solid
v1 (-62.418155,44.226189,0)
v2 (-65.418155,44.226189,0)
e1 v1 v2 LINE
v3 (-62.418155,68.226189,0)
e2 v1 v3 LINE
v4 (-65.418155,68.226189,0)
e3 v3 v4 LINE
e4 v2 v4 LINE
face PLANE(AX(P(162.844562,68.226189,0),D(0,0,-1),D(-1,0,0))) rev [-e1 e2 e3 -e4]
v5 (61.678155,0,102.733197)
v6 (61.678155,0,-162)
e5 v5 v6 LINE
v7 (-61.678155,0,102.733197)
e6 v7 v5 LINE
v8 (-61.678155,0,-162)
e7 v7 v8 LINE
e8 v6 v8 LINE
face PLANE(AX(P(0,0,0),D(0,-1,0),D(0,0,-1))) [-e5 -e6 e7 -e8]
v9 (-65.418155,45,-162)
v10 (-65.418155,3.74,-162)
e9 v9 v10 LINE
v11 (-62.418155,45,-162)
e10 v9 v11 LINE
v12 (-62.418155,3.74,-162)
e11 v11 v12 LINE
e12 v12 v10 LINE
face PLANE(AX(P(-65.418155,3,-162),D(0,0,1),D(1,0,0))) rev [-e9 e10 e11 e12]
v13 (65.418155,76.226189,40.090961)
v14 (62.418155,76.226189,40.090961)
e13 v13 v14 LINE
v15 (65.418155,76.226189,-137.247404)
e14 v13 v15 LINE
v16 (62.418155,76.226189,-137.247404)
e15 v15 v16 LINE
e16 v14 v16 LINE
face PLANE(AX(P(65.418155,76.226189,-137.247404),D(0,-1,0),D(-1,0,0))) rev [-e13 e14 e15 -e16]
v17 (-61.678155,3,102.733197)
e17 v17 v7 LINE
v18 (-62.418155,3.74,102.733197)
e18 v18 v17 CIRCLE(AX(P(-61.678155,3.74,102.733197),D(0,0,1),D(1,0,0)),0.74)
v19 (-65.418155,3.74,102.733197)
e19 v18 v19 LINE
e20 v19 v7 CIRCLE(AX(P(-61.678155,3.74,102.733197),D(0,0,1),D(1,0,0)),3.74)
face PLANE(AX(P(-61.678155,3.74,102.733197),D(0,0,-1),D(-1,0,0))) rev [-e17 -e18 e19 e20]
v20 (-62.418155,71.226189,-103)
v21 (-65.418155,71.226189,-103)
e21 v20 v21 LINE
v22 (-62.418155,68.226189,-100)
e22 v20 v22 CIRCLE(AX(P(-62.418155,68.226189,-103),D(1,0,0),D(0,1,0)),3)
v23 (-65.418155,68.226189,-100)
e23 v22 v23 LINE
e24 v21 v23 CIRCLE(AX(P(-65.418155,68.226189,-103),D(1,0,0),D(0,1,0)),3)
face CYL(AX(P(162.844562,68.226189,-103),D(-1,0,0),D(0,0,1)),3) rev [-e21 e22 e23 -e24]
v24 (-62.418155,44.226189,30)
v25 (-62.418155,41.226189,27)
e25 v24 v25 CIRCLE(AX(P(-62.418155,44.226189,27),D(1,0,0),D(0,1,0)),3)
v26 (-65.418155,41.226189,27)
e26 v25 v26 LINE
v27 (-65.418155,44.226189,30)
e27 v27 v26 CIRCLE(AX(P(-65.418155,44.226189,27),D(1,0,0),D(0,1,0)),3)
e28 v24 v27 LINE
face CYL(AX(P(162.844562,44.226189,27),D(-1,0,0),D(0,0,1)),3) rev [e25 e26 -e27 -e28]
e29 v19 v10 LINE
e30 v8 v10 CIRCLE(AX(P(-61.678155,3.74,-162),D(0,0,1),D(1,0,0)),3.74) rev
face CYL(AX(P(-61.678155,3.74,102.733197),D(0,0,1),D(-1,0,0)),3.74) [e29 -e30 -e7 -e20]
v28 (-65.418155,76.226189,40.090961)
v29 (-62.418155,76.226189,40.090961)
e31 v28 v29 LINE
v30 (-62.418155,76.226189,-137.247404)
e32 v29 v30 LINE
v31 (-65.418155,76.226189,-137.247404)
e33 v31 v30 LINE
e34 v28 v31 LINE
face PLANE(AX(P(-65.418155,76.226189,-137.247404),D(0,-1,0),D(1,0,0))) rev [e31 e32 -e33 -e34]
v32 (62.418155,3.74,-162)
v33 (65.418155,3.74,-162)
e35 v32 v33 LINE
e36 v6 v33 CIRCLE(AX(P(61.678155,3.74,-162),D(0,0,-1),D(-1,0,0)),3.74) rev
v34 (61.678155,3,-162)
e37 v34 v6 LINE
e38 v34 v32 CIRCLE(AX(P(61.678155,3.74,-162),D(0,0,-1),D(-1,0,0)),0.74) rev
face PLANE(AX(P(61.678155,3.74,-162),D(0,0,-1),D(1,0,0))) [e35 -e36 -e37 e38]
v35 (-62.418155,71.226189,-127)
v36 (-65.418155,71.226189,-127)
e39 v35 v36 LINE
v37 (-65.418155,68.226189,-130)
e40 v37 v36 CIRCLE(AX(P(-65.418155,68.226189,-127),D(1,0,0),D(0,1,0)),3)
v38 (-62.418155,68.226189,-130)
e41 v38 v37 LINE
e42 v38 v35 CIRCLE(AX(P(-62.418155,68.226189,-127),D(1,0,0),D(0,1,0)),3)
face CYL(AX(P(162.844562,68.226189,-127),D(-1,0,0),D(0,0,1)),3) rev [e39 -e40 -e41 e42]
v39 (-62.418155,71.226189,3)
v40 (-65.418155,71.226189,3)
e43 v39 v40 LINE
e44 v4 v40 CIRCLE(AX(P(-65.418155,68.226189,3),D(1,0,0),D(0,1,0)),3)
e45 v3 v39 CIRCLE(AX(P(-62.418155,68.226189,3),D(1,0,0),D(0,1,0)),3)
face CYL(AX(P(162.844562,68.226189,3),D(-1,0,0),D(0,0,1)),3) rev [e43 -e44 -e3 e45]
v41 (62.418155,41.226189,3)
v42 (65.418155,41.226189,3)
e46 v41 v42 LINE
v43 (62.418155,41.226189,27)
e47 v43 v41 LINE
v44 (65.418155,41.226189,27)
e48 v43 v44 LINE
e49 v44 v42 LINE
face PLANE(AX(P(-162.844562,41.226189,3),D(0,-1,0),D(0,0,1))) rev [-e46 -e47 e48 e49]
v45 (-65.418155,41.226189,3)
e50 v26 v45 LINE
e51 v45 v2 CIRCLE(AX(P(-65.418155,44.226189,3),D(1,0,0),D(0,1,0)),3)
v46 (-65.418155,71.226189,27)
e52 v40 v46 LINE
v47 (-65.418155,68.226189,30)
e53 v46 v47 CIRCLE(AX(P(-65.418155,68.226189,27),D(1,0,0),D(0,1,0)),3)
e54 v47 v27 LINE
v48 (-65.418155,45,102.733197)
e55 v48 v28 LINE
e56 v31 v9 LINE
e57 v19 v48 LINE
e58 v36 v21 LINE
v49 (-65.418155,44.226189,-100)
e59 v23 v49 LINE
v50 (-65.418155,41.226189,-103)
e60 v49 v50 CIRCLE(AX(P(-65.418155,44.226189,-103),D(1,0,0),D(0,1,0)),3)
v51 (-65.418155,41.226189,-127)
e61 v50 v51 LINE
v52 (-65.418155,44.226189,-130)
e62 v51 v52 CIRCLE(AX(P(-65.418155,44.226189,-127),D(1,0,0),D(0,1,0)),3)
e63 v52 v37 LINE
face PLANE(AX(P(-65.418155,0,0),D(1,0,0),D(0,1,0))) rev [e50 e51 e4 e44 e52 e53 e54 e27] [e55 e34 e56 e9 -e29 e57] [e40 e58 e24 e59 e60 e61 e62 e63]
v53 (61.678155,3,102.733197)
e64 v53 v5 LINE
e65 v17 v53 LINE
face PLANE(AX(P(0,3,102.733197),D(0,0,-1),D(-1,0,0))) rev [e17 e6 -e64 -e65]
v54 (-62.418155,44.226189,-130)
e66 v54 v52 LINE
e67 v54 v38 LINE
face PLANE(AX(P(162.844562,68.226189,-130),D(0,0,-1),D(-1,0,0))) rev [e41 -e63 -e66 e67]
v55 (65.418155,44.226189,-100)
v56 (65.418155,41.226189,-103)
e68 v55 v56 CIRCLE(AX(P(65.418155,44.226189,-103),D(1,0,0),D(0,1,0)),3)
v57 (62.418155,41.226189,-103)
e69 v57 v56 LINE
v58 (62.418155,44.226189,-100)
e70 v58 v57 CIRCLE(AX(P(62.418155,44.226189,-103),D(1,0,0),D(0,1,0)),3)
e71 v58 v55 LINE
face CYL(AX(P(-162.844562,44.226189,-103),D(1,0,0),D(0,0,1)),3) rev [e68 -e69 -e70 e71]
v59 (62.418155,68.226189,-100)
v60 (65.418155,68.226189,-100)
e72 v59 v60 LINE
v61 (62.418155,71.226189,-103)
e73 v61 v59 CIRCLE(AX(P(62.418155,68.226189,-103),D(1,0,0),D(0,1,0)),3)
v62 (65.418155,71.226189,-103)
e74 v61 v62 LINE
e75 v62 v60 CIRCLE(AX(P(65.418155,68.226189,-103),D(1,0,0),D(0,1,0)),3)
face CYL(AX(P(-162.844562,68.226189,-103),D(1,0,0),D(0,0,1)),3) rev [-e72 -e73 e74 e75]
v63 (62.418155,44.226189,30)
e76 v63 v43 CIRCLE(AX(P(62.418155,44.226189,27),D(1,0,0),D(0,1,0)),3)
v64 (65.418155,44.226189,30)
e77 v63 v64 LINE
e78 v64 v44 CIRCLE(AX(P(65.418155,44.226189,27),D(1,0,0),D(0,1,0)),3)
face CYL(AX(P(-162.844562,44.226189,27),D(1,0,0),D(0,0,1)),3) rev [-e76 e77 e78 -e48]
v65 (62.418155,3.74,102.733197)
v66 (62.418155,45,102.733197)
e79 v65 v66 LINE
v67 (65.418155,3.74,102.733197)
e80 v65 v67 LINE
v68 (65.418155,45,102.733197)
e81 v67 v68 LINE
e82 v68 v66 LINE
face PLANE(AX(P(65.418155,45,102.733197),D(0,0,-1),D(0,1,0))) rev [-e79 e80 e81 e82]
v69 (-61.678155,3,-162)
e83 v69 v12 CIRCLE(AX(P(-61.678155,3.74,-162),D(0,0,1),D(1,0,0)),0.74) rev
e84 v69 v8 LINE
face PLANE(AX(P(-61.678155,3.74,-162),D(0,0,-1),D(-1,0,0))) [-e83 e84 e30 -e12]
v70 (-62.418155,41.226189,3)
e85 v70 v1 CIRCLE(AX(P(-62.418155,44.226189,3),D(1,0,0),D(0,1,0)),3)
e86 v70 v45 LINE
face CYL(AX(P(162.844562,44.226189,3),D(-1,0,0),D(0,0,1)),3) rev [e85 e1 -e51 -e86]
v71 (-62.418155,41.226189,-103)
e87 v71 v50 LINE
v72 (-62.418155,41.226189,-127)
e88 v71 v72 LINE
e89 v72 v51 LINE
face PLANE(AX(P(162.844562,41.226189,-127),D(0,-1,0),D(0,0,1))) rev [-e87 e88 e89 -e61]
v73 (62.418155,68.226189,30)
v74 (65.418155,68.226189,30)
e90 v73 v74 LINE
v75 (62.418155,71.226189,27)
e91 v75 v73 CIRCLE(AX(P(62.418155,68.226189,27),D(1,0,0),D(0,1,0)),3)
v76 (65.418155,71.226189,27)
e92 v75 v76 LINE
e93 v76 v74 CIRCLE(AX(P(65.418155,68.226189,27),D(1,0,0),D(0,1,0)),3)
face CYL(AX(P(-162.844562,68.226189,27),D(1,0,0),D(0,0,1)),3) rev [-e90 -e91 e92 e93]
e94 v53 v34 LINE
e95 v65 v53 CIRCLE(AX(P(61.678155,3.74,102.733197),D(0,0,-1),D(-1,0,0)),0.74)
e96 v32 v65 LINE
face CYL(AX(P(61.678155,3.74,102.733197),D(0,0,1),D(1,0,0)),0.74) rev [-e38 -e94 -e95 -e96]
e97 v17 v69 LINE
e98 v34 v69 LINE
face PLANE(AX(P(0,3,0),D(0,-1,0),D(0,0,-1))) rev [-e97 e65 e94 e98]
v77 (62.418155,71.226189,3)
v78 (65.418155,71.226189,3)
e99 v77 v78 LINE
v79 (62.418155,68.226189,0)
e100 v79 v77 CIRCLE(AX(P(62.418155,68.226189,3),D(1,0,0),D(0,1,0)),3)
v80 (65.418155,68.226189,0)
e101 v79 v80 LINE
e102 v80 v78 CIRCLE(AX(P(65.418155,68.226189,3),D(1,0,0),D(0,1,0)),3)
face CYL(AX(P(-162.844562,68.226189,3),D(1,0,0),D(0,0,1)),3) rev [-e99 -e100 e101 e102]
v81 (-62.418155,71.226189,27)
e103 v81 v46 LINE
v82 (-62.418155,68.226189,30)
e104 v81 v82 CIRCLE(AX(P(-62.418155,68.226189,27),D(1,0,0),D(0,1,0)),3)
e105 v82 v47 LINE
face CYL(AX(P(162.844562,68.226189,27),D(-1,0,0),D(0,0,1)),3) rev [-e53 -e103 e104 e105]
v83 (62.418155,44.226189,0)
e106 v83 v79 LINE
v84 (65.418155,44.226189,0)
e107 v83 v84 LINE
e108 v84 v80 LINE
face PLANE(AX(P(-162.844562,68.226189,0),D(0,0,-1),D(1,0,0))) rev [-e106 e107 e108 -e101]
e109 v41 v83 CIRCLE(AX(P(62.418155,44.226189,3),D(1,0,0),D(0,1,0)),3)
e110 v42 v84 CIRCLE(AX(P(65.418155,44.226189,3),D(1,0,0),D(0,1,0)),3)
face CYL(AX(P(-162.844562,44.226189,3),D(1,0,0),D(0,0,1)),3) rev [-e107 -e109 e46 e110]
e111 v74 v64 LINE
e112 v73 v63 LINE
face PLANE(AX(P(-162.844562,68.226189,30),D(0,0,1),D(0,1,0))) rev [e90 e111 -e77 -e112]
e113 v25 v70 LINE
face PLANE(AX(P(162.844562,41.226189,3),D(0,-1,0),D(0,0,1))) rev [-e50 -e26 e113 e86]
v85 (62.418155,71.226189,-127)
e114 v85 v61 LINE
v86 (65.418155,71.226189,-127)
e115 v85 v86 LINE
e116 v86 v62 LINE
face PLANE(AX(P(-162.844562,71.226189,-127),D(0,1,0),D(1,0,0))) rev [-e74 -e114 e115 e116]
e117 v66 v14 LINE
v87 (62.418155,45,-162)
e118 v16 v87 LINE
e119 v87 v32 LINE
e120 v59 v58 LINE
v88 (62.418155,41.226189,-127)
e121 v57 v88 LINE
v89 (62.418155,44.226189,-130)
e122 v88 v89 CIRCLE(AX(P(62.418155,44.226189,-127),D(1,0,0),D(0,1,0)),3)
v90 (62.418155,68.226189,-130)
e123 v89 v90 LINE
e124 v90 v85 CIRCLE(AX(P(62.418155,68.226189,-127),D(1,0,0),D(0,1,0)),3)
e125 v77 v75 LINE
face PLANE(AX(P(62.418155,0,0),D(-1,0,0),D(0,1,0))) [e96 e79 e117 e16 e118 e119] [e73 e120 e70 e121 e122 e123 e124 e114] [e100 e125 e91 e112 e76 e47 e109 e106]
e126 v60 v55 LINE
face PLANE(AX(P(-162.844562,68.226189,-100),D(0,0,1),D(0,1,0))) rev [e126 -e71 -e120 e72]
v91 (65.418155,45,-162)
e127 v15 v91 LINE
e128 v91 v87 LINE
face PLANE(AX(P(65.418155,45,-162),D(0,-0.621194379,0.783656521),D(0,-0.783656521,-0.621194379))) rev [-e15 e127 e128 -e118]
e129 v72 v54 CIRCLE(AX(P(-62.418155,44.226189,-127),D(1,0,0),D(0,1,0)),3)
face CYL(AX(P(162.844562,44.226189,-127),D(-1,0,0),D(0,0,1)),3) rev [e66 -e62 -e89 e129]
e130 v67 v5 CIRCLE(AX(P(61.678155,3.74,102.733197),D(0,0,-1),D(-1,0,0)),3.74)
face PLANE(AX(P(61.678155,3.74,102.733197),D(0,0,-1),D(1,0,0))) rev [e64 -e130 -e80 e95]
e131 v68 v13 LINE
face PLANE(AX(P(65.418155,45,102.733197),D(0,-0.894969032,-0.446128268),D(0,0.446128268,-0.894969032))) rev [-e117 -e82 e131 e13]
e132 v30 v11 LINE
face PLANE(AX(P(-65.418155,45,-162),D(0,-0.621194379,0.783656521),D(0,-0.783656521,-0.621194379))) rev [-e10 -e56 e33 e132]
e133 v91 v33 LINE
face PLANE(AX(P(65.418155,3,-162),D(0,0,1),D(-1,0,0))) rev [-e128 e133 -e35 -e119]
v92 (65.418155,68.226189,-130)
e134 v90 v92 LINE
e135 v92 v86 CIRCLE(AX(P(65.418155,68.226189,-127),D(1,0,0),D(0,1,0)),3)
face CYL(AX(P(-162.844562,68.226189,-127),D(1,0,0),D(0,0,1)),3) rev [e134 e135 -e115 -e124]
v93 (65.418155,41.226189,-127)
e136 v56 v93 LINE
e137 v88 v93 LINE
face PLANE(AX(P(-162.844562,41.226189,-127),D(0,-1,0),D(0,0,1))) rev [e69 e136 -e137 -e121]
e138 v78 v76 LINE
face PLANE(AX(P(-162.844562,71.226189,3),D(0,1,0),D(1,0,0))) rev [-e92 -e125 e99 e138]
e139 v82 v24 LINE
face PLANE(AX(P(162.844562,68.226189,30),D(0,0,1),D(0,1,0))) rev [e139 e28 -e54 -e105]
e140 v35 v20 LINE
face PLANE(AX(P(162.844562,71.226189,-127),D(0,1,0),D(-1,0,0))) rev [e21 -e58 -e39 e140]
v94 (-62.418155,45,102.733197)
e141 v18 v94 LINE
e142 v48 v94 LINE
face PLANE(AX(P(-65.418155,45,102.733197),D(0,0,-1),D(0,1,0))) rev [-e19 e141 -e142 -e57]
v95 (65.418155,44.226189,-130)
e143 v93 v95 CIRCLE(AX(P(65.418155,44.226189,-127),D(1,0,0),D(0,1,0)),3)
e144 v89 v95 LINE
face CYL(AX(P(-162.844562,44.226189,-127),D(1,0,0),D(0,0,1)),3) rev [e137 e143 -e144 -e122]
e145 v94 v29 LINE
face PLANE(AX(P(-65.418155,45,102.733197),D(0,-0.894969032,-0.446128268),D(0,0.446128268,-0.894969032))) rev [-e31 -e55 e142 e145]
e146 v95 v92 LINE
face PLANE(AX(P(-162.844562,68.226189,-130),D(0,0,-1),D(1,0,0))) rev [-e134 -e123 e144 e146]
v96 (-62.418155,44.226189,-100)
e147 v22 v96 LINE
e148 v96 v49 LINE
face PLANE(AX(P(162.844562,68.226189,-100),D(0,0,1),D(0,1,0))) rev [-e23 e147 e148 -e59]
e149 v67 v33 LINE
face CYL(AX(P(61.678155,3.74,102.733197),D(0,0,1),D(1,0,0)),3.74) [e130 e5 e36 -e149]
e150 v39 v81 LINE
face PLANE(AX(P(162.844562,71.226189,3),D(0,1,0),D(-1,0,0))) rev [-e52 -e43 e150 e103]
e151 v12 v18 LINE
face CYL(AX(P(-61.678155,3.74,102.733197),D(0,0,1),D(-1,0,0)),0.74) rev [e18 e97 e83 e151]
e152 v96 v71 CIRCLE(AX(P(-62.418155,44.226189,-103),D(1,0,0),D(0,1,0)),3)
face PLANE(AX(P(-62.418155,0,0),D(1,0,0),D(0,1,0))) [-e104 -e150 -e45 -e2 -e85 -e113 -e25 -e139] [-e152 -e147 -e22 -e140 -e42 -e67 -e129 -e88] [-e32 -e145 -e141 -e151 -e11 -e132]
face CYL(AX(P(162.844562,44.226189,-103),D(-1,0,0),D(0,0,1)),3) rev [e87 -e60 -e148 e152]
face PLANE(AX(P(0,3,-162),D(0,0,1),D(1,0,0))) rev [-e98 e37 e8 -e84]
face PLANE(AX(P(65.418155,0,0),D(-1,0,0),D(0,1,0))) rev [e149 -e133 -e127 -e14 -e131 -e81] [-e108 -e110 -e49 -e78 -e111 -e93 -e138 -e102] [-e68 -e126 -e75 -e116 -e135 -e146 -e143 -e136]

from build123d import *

# Parameters (mm, degrees)
SKETCH_1_W                       = 65.418154724
SKETCH_1_H                       = 264.733197448
SM_BASE_FLANGE_1_DEPTH           = 3
SM_EDGE_FLANGE_1_STRIP_W         = 13.48
SM_EDGE_FLANGE_1_STRIP_H         = 3
SM_EDGE_FLANGE_1_STRIP_CUT_DEPTH = 264.733197448
SM_EDGE_FLANGE_1_DEPTH           = 264.733197448
SM_EDGE_FLANGE_1_FLAT_DEPTH      = 3
OTHER_START                      = -65.418154724
OTHER_1_DEPTH                    = 3


# Read off the part's stored shape, not the designer's step: Полость1
# Sheet-metal steps are written as plain solids
with BuildPart() as part:
    # Sketch 1 → Базовая кромка1 (new body)
    with BuildSketch(Plane(origin=(0, 0, 0), x_dir=(1, 0, 0), z_dir=(0, 1, 0))):
        with Locations((-32.709077362, 29.633401276)):
            Rectangle(SKETCH_1_W, SKETCH_1_H)
    extrude(amount=SM_BASE_FLANGE_1_DEPTH)

    # Ребро-кромка1 strip (across the edge) → Ребро-кромка1 strip cut (cut)
    with BuildSketch(Plane(origin=(-65.418154724, 3, -162), x_dir=(1, 0, 0), z_dir=(0, 0, 1))):
        with Locations((-3, -1.5)):
            Rectangle(SM_EDGE_FLANGE_1_STRIP_W, SM_EDGE_FLANGE_1_STRIP_H)
    extrude(amount=SM_EDGE_FLANGE_1_STRIP_CUT_DEPTH, mode=Mode.SUBTRACT)

    # Ребро-кромка1 bend section (across the edge) → Ребро-кромка1 (add)
    with BuildSketch(Plane(origin=(-65.418154724, 3, -162), x_dir=(1, 0, 0), z_dir=(0, 0, 1))):
        with BuildLine():
            Line((0, 0.74), (3, 0.74))
            ThreePointArc((3, 0.74), (3.216740982, 0.216740982), (3.74, 0))
            Line((3.74, 0), (3.74, -3))
            ThreePointArc((3.74, -3), (1.095420638, -1.904579362), (0, 0.74))
        make_face()
    extrude(amount=SM_EDGE_FLANGE_1_DEPTH)

    # Ребро-кромка1 profile (on flange) → Ребро-кромка1 flat (add)
    with BuildSketch(Plane(origin=(-65.418154724, 3, 0), x_dir=(0, 0, 1), z_dir=(-1, 0, 0))):
        Polygon((-162, 0.74), (102.733197448, 0.74), (102.733197448, 42), (40.090960975, 73.22618932), (-137.247403995, 73.22618932), (-162, 42), align=None)
    extrude(amount=-SM_EDGE_FLANGE_1_FLAT_DEPTH)

    # Полость1 outline → Полость1 (cut)
    with BuildSketch(Plane.YZ.offset(OTHER_START)):
        with BuildLine():
            ThreePointArc((44.22618932, 30), (42.104868976, 29.121320344), (41.22618932, 27))
            Line((41.22618932, 27), (41.22618932, 3))
            ThreePointArc((41.22618932, 3), (42.104868976, 0.878679656), (44.22618932, 0))
            Line((44.22618932, 0), (68.22618932, 0))
            ThreePointArc((68.22618932, 0), (70.347509663, 0.878679657), (71.22618932, 3))
            Line((71.22618932, 3), (71.22618932, 27))
            ThreePointArc((71.22618932, 27), (70.347509663, 29.121320343), (68.22618932, 30))
            Line((68.22618932, 30), (44.22618932, 30))
        make_face()
        with BuildLine():
            ThreePointArc((44.22618932, -100), (42.104868976, -100.878679656), (41.22618932, -103))
            Line((41.22618932, -103), (41.22618932, -127))
            ThreePointArc((41.22618932, -127), (42.104868976, -129.121320344), (44.22618932, -130))
            Line((44.22618932, -130), (68.22618932, -130))
            ThreePointArc((68.22618932, -130), (70.347509663, -129.121320344), (71.22618932, -127))
            Line((71.22618932, -127), (71.22618932, -103))
            ThreePointArc((71.22618932, -103), (70.347509663, -100.878679656), (68.22618932, -100))
            Line((68.22618932, -100), (44.22618932, -100))
        make_face()
    extrude(amount=OTHER_1_DEPTH, mode=Mode.SUBTRACT)

    # Зеркальное отражение1: part across plane


with BuildPart() as part_1:
    add(part.part)
    add(part.part.mirror(Plane(origin=(0, 3, -162), x_dir=(0, 0, 1), z_dir=(-1, 0, 0))))


solid = part_1.part
